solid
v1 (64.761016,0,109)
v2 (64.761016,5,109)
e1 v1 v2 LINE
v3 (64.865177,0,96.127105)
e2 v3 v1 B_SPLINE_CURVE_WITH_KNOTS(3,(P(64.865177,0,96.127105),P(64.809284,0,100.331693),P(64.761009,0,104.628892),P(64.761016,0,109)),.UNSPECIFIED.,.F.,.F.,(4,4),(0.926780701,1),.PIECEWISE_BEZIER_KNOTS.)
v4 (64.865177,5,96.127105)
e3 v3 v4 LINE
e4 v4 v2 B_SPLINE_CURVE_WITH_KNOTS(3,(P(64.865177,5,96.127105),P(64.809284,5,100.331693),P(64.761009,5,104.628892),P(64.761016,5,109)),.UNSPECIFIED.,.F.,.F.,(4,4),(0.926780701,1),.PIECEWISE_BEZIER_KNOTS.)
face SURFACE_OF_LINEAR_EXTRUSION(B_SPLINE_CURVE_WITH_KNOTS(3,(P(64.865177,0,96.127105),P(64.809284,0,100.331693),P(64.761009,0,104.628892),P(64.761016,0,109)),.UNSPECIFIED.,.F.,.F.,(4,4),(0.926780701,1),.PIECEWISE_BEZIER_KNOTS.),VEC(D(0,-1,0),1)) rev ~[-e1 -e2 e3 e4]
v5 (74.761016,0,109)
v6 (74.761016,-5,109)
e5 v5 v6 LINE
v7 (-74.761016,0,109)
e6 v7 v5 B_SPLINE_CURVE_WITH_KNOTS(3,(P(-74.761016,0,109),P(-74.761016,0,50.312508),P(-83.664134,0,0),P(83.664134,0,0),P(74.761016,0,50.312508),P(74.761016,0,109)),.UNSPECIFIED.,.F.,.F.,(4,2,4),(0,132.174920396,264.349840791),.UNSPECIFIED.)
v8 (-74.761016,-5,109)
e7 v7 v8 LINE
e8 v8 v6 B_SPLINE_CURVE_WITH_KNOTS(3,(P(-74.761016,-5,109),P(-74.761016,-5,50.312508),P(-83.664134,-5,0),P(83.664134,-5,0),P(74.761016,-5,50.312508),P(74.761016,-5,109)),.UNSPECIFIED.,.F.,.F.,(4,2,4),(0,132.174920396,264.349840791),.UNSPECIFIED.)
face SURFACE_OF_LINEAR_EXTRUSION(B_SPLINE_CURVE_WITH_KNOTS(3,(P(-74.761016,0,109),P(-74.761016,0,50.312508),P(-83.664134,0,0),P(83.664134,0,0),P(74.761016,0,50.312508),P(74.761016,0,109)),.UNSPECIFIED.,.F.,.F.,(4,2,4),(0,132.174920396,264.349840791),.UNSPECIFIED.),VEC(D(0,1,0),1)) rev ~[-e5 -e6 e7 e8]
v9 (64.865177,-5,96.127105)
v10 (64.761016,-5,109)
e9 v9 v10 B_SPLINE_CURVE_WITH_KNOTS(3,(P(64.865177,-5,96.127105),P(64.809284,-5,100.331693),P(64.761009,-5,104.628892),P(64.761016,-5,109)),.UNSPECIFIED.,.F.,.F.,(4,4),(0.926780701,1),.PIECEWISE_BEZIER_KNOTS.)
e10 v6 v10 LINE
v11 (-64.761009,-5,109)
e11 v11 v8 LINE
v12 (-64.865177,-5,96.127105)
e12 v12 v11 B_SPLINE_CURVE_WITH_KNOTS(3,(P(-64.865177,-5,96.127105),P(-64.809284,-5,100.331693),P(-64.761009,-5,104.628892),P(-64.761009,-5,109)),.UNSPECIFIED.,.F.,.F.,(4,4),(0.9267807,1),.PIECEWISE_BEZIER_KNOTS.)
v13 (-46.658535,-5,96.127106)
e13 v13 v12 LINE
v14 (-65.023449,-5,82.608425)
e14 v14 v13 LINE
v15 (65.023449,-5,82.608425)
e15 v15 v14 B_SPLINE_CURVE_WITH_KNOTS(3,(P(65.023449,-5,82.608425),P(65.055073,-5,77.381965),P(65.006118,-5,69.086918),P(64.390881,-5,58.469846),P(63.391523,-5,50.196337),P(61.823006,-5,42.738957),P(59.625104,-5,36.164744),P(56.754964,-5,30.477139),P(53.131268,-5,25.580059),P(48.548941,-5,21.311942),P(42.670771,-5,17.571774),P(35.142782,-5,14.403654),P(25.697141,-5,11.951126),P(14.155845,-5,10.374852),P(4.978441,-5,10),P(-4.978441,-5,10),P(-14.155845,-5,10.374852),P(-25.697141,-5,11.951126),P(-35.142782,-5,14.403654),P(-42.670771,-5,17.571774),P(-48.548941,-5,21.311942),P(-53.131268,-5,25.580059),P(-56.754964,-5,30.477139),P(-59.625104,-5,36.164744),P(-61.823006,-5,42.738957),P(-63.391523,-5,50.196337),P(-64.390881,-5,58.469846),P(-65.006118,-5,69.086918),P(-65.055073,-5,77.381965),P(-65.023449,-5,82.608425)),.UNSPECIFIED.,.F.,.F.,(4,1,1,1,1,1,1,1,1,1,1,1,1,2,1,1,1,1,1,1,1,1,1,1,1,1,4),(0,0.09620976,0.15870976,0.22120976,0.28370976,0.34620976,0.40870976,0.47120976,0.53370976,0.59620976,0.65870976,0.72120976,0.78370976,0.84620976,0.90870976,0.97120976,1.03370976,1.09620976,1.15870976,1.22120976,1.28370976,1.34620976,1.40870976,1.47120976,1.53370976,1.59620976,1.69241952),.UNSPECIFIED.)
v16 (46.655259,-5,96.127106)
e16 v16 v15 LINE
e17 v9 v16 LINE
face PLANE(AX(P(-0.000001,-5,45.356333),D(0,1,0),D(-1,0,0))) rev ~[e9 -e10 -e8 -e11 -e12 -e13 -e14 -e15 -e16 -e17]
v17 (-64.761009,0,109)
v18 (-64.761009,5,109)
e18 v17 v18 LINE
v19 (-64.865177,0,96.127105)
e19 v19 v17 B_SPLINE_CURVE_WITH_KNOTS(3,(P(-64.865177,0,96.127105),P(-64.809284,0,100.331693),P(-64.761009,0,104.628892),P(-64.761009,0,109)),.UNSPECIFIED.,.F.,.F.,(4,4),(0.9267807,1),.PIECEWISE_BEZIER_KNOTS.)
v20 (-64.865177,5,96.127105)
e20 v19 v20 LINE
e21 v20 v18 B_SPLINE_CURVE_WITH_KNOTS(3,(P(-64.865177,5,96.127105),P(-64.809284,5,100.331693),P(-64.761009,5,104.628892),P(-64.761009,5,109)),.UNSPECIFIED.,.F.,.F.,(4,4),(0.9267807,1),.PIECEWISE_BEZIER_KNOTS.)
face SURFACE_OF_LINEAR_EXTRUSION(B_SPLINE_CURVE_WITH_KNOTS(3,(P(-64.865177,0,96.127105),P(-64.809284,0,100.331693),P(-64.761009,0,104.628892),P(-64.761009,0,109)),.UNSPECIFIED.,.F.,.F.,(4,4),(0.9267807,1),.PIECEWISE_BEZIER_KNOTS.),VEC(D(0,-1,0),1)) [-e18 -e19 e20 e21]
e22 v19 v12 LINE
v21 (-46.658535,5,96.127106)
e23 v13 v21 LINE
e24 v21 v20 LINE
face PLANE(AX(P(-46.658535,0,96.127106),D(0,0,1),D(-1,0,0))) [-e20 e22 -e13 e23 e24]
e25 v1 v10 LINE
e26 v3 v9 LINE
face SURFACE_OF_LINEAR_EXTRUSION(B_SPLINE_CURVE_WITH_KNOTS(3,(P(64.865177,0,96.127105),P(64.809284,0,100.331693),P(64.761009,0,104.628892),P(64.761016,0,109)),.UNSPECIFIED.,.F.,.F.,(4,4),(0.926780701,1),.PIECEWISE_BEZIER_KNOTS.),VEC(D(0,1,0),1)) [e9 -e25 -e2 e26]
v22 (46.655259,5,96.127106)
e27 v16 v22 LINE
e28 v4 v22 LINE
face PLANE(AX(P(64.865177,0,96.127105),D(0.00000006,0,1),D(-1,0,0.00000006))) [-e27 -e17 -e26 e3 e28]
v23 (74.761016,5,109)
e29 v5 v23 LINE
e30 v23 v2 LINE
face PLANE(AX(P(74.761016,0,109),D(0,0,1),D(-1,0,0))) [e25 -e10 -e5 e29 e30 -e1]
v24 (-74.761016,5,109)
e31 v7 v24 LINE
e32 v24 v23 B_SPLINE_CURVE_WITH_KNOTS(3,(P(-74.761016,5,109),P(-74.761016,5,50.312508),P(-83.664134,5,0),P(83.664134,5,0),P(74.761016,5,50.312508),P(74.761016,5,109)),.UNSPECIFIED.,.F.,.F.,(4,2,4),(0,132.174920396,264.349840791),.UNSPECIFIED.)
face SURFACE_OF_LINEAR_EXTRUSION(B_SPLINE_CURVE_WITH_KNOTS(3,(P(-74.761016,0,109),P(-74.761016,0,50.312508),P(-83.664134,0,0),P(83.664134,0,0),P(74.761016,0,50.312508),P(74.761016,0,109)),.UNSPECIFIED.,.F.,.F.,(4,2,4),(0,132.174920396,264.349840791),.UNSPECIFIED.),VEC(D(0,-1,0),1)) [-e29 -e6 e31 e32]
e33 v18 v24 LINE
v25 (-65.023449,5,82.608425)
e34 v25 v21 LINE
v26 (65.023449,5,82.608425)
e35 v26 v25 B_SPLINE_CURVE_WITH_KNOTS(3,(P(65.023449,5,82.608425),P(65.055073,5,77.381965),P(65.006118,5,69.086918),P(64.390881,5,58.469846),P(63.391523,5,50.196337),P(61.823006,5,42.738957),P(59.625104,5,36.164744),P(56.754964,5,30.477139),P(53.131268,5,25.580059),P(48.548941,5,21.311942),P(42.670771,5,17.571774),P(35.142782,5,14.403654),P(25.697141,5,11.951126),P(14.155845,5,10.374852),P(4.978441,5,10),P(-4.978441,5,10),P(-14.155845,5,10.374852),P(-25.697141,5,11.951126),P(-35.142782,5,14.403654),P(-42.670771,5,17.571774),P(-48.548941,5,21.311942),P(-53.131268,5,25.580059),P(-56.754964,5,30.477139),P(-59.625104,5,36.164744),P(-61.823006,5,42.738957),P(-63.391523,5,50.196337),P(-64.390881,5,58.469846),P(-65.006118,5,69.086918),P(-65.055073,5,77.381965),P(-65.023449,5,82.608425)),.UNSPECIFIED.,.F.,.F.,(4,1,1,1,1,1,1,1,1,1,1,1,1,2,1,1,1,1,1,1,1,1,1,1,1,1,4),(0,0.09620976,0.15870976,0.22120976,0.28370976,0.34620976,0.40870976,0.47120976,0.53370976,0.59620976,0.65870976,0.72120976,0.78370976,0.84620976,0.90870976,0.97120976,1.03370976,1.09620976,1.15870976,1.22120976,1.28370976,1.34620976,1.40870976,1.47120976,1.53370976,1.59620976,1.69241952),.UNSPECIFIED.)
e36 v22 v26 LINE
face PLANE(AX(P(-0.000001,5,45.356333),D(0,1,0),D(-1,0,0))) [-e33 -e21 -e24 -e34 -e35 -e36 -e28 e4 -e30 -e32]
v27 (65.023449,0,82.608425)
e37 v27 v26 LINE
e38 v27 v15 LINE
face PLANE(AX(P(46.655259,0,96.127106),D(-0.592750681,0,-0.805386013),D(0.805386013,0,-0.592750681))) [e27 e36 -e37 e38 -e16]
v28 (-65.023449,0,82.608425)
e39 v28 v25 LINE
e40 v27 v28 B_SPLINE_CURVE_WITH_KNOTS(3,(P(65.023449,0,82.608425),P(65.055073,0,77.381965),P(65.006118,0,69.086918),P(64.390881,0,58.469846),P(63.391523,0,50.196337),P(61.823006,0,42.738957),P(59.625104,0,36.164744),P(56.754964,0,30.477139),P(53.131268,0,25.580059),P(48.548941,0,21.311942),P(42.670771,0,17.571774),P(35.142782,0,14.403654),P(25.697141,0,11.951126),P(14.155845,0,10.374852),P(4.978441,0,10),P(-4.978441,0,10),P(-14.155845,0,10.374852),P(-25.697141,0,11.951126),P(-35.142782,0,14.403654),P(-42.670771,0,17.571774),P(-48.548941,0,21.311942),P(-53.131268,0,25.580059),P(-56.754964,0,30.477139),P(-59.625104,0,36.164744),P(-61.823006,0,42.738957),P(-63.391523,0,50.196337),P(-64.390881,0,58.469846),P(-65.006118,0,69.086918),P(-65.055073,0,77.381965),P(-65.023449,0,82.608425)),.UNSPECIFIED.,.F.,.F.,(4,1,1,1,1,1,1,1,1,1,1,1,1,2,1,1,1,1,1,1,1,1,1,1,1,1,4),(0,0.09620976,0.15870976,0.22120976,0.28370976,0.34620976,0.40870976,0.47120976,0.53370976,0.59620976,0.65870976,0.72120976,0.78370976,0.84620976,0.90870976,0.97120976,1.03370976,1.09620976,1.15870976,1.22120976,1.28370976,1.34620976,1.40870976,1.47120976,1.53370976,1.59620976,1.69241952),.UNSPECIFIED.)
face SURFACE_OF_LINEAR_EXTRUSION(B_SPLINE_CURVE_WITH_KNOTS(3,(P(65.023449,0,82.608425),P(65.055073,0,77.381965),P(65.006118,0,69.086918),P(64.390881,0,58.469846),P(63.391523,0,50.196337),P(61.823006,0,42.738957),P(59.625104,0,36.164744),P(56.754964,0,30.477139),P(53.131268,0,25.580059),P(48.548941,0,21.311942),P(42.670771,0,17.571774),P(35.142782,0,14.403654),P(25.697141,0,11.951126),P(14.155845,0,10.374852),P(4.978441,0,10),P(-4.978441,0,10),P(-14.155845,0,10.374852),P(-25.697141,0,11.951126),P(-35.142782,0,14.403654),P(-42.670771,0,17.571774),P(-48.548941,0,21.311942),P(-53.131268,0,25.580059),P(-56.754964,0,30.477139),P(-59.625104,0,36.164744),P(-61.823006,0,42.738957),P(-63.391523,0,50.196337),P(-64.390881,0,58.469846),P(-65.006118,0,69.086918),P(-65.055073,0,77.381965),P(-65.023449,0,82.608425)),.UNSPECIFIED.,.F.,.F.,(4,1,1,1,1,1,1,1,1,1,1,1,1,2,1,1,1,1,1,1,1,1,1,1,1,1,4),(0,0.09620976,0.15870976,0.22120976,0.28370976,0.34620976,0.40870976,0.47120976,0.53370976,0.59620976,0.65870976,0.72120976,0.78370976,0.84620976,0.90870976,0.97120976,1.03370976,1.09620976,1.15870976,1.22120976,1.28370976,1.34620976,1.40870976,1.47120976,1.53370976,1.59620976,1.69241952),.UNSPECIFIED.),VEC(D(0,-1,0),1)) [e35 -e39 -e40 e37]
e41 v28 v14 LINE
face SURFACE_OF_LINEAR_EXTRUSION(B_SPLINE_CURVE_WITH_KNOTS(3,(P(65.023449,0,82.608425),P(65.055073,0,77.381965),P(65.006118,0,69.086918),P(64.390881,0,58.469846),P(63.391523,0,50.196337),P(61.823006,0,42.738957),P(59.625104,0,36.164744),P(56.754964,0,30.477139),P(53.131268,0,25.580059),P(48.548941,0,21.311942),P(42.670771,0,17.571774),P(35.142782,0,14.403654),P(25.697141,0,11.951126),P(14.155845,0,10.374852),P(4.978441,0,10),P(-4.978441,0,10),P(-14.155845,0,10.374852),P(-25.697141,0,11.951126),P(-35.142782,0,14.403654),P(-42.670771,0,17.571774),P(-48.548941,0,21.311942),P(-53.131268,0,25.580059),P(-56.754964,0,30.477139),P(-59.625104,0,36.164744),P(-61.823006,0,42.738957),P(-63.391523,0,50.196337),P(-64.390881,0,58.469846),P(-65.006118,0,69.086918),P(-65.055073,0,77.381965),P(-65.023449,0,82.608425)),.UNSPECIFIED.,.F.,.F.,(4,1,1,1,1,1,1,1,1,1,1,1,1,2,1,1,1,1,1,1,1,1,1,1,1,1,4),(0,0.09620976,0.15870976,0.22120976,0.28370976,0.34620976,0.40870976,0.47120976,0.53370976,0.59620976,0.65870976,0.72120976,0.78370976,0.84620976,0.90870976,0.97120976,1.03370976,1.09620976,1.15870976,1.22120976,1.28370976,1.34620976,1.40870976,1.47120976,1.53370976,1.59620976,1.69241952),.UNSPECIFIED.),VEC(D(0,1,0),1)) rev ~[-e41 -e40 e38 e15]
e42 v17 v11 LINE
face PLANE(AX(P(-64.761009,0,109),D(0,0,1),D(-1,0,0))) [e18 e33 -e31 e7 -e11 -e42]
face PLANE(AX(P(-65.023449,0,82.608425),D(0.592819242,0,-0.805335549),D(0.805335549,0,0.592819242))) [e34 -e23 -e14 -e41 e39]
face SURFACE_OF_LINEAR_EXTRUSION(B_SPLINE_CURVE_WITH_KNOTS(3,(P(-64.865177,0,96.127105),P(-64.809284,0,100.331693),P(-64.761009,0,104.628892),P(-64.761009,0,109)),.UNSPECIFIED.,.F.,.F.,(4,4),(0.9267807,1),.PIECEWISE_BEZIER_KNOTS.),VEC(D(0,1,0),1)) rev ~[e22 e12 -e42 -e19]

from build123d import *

# Parameters (mm, degrees)
F1_DEPTH = 5


# Not quite as in the source:
# - ends of sketch curves that miss each other by under 0.0002 mm in the source are joined
# - the dataset's text gives a spline's control points without its knots; the knots are read off the source's solid


with BuildPart() as f1:
    # F0 (on Front) → F1 (new body, symmetric)
    with BuildSketch(Plane.XZ):
        with BuildLine():
            add(Edge.make_bspline(
                [(0, 0), (-83.6641341448, 0), (-74.7610164563, 50.3125078976), (-74.7610164563, 109)],
                knots=[0, 0, 0, 0, 132.1749203956, 132.1749203956, 132.1749203956, 132.1749203956], degree=3))
            add(Edge.make_bspline(
                [(0, 0), (83.6641341448, 0), (74.7610164563, 50.3125078976), (74.7610164563, 109)],
                knots=[0, 0, 0, 0, 132.1749203956, 132.1749203956, 132.1749203956, 132.1749203956], degree=3))
            Line((74.7610164563, 109), (64.7610164563, 109))
            add(Edge.make_bspline(
                [(64.8651773016, 96.1271052425), (64.809283505, 100.3316929307), (64.7610087024, 104.6288918899), (64.7610164563, 109)],
                knots=[0.9267807006, 0.9267807006, 0.9267807006, 0.9267807006, 1, 1, 1, 1], degree=3))
            add(Edge.make_bspline(
                [(65.0234491439, 82.6084248881), (65.0139858714, 84.1724141651), (64.9721404166, 88.5989382646), (64.9047054038, 93.153620136), (64.8651773016, 96.1271052425)],
                knots=[0.8462097598, 0.8462097598, 0.8462097598, 0.8462097598, 0.875, 0.9267807006, 0.9267807006, 0.9267807006, 0.9267807006], degree=3))
            add(Edge.make_bspline(
                [(0, 10), (4.9784405013, 10), (14.1558453385, 10.3748520854), (25.6971414705, 11.9511255345), (35.1427822184, 14.4036535664), (42.6707713147, 17.5717741572), (48.5489406763, 21.3119415285), (53.1312678675, 25.5800594028), (56.7549643638, 30.4771390793), (59.6251039368, 36.1647439539), (61.8230057051, 42.7389566362), (63.3915232472, 50.196336895), (64.3908810398, 58.469845885), (65.0061181592, 69.0869180815), (65.0550730263, 77.3819650971), (65.0234491439, 82.6084248881)],
                knots=[0, 0, 0, 0, 0.0625, 0.125, 0.1875, 0.25, 0.3125, 0.375, 0.4375, 0.5, 0.5625, 0.625, 0.6875, 0.75, 0.8462097598, 0.8462097598, 0.8462097598, 0.8462097598], degree=3))
            add(Edge.make_bspline(
                [(0, 10), (-4.9784405013, 10), (-14.1558453385, 10.3748520854), (-25.6971414705, 11.9511255345), (-35.1427822184, 14.4036535664), (-42.6707713147, 17.5717741572), (-48.5489406763, 21.3119415285), (-53.1312678675, 25.5800594028), (-56.7549643638, 30.4771390793), (-59.6251039368, 36.1647439539), (-61.8230057051, 42.7389566362), (-63.3915232472, 50.196336895), (-64.3908810398, 58.469845885), (-65.0061181601, 69.0869180966), (-65.0550730265, 77.3819651301), (-65.0234491436, 82.6084249395)],
                knots=[0, 0, 0, 0, 0.0625, 0.125, 0.1875, 0.25, 0.3125, 0.375, 0.4375, 0.5, 0.5625, 0.625, 0.6875, 0.75, 0.8462097601, 0.8462097601, 0.8462097601, 0.8462097601], degree=3))
            add(Edge.make_bspline(
                [(-65.0234491436, 82.6084249395), (-65.0139858711, 84.1724141997), (-64.9721404166, 88.5989382611), (-64.9047054044, 93.1536200922), (-64.8651773025, 96.1271051757)],
                knots=[0.8462097601, 0.8462097601, 0.8462097601, 0.8462097601, 0.875, 0.9267807002, 0.9267807002, 0.9267807002, 0.9267807002], degree=3))
            add(Edge.make_bspline(
                [(-64.8651773025, 96.1271051757), (-64.8092835055, 100.3316928852), (-64.7610087024, 104.6288918667), (-64.7610087024, 109)],
                knots=[0.9267807002, 0.9267807002, 0.9267807002, 0.9267807002, 1, 1, 1, 1], degree=3))
            Line((-64.7610087024, 109), (-74.7610164563, 109))
        make_face()
        with BuildLine():
            add(Edge.make_bspline(
                [(65.0234491439, 82.6084248881), (65.0139858714, 84.1724141651), (64.9721404166, 88.5989382646), (64.9047054038, 93.153620136), (64.8651773016, 96.1271052425)],
                knots=[0.8462097598, 0.8462097598, 0.8462097598, 0.8462097598, 0.875, 0.9267807006, 0.9267807006, 0.9267807006, 0.9267807006], degree=3))
            Line((64.8651773016, 96.1271052425), (46.6552594428, 96.1271063344))
            Line((46.6552594428, 96.1271063344), (65.0234491439, 82.6084248881))
        make_face()
        with BuildLine():
            Line((-46.6585347408, 96.1271062676), (-64.8652594437, 96.1271062676))
            add(Edge.make_bspline(
                [(-65.0234491436, 82.6084249395), (-65.0139858711, 84.1724141997), (-64.9721404166, 88.5989382611), (-64.9047054044, 93.1536200922), (-64.8652594437, 96.1271062676)],
                knots=[0.8462097601, 0.8462097601, 0.8462097601, 0.8462097601, 0.875, 0.9267807002, 0.9267807002, 0.9267807002, 0.9267807002], degree=3))
            Line((-65.0234491436, 82.6084249395), (-46.6585347408, 96.1271062676))
        make_face()
    extrude(amount=F1_DEPTH, both=True)


solid = f1.part
